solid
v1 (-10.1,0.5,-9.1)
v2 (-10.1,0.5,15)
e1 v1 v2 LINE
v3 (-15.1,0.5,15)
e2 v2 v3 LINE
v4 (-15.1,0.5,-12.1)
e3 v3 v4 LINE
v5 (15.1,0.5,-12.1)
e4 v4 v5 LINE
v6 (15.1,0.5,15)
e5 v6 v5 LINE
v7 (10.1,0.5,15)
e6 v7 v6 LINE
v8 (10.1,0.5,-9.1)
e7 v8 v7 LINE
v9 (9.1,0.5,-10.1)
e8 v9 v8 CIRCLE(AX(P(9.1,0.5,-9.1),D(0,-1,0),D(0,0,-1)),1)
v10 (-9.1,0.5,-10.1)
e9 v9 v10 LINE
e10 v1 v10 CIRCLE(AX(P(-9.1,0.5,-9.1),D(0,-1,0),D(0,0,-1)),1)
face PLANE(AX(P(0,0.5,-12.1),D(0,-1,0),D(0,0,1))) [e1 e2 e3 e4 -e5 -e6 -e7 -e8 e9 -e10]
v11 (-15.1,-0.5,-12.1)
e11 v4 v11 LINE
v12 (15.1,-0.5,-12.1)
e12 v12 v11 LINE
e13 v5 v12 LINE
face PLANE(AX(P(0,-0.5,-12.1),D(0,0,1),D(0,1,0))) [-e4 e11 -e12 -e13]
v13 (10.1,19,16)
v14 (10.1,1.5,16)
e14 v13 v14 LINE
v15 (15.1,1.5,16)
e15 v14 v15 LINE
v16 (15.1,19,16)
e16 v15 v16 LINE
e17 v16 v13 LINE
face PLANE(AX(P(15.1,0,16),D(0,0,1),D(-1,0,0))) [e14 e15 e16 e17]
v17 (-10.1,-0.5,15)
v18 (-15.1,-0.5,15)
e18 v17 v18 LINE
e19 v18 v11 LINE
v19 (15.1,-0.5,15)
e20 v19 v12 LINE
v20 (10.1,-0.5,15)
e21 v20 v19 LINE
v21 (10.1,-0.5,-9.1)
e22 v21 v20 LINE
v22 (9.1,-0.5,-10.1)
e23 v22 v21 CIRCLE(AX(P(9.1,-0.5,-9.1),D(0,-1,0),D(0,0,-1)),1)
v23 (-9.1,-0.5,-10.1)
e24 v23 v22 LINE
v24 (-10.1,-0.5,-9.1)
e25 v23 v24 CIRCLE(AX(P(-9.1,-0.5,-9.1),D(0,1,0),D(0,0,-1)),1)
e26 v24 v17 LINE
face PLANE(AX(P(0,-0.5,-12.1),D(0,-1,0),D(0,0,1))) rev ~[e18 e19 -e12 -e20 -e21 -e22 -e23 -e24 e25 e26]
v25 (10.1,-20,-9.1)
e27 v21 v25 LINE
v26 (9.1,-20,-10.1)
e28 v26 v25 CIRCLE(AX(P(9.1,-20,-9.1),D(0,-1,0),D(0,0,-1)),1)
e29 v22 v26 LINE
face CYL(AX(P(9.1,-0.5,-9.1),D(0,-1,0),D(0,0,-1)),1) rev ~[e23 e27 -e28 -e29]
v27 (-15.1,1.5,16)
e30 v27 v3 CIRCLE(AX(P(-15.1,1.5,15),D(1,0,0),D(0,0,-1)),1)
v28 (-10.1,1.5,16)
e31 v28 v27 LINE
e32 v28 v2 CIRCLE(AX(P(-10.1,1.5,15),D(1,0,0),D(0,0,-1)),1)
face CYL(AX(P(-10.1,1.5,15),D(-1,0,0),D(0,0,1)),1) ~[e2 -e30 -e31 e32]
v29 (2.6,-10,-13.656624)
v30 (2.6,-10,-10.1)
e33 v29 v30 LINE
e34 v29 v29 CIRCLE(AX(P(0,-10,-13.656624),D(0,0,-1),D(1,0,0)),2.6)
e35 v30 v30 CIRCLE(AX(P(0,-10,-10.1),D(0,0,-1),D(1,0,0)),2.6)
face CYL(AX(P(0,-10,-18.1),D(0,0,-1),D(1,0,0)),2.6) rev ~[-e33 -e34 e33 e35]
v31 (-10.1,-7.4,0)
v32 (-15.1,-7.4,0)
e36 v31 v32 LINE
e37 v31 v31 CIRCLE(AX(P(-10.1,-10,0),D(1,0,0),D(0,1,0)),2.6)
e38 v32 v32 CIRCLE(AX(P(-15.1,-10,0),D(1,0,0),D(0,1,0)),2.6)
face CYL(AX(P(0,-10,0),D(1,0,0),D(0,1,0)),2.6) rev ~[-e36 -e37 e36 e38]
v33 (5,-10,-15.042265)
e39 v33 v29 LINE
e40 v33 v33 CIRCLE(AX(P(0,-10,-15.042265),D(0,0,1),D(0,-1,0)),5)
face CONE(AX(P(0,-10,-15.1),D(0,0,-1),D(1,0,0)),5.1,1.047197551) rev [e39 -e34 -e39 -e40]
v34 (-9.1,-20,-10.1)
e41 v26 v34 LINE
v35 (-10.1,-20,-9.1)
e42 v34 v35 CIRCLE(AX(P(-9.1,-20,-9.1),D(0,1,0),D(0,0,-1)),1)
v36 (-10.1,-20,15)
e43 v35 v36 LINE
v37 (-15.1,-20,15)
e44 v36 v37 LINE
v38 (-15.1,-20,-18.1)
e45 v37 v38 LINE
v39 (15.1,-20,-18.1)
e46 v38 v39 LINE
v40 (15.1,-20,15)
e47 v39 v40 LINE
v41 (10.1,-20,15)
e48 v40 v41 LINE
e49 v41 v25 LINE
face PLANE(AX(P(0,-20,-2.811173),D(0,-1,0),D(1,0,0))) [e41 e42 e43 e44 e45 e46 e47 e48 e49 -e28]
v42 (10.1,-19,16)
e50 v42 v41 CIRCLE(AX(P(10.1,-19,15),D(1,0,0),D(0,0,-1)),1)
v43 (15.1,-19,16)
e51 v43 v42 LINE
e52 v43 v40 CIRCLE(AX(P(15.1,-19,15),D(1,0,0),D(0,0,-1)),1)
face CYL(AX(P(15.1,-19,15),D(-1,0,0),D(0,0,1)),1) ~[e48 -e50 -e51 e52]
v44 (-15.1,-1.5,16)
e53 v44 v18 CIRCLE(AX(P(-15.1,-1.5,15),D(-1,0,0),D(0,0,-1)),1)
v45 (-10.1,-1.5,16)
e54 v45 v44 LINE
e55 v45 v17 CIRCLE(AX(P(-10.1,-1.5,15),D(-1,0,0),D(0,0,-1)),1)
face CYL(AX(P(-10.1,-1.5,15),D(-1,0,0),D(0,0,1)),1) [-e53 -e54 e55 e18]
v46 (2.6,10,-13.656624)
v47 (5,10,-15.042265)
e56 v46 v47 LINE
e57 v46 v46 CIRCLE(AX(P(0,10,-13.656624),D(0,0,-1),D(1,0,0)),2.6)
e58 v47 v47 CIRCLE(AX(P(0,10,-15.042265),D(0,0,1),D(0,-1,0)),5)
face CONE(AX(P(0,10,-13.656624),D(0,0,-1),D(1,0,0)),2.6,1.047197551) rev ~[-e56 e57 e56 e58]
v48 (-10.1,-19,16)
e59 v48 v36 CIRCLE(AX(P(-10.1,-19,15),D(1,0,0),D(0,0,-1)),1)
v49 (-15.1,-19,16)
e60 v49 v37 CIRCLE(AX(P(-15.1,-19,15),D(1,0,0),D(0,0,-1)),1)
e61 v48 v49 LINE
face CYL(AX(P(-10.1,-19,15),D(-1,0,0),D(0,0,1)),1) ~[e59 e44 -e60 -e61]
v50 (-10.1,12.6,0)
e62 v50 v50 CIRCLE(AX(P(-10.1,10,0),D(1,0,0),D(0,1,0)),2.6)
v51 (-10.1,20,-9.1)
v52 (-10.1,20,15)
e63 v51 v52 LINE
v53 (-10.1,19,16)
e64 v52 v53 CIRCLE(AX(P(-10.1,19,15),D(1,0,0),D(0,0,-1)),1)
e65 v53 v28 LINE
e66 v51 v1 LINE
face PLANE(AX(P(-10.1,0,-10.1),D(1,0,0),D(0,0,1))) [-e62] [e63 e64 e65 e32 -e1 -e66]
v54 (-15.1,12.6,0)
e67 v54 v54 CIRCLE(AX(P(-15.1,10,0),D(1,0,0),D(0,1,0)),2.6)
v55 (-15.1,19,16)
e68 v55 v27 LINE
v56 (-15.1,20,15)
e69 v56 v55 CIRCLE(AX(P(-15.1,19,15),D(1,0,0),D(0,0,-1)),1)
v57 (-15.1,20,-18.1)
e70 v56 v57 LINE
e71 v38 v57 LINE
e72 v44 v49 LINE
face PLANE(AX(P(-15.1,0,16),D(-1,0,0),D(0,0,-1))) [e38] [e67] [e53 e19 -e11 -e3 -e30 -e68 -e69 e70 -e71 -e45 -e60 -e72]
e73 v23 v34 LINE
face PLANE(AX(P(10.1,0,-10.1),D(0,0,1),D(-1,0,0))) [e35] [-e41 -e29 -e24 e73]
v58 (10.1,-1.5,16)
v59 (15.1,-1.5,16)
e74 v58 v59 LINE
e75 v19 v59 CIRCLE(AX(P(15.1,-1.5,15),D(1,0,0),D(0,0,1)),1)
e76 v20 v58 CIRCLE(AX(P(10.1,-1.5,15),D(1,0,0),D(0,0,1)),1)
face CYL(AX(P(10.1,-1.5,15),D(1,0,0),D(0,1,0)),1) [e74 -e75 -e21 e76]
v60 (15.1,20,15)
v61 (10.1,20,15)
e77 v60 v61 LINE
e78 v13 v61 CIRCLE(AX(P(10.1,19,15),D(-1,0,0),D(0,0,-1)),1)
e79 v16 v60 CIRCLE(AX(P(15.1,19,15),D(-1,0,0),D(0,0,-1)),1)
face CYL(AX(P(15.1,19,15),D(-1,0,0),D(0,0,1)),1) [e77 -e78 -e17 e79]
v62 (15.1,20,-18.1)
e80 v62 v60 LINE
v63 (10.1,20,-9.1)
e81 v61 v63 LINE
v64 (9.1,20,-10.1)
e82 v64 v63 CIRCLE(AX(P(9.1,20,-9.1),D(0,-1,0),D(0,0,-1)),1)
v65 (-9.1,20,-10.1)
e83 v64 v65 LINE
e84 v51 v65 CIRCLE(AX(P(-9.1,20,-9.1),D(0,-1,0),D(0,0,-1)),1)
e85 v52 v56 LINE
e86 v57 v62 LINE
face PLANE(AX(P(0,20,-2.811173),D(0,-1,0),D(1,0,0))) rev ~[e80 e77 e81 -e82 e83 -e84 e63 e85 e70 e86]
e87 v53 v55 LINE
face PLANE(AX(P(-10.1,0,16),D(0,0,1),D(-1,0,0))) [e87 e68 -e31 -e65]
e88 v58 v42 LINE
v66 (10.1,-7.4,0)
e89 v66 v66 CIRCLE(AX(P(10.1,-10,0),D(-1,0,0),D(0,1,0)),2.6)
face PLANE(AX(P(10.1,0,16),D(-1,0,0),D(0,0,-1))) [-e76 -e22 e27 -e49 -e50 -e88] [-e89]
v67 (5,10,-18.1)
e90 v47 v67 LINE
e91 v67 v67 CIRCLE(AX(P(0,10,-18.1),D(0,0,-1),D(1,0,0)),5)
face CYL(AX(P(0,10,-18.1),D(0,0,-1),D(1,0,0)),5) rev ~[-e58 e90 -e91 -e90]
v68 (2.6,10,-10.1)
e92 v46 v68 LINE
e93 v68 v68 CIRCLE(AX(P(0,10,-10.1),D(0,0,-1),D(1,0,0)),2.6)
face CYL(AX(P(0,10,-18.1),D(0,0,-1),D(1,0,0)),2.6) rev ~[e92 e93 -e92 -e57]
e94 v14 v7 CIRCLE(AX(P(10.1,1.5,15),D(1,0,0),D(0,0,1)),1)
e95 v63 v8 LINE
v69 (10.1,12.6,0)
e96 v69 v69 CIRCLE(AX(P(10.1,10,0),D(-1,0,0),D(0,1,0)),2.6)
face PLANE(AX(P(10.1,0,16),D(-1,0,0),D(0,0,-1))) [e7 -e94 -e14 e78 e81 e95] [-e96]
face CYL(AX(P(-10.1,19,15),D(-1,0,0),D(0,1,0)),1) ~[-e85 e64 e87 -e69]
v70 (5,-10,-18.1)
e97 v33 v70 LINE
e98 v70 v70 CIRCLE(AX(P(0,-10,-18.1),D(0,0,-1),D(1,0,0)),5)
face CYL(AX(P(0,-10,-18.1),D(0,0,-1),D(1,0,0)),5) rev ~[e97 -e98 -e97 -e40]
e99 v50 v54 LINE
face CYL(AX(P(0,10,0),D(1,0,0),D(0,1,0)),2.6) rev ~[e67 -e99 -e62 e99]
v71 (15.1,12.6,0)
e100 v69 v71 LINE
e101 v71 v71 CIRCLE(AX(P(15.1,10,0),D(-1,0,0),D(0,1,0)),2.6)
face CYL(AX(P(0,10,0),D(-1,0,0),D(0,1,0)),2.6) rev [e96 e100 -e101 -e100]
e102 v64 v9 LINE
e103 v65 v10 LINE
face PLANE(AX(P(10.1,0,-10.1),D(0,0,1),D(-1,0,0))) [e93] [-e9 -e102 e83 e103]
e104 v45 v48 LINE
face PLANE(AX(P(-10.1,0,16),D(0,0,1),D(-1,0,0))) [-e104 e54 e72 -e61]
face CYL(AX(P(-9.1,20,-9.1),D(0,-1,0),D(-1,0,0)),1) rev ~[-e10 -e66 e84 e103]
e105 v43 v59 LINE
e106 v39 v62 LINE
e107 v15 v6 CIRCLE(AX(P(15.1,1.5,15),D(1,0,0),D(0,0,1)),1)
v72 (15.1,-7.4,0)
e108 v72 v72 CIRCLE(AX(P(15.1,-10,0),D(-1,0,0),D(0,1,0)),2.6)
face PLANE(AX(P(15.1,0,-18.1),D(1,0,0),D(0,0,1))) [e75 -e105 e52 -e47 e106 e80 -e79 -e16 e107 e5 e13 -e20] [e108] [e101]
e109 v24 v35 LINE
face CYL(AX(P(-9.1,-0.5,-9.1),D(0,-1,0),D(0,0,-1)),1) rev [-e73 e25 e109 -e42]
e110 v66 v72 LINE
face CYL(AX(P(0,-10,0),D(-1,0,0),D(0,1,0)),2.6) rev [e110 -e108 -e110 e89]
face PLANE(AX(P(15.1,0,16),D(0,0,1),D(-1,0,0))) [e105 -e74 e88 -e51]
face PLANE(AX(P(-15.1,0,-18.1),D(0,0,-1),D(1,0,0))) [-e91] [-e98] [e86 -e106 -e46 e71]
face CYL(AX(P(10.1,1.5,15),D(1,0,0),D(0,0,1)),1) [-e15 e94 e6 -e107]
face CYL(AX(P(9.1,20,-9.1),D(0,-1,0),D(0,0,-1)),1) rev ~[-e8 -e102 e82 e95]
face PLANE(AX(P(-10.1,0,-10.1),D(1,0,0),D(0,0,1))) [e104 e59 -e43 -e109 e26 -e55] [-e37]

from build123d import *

# Parameters (mm, degrees)
F2_DEPTH      = 20
F3_W          = 1
F3_H          = 28.1
F4_DEPTH      = 15.101
F4_DEPTH_BACK = 15.101
F5_R          = 2.6
F6_DEPTH      = 15.101
F6_DEPTH_BACK = 15.101
F7_R          = 2.6
F8_DEPTH      = 8
F9_R          = 5
F10_DEPTH     = 3
F11_S5_R      = 5
F11_T6_DEPTH  = 9
F11_S11_R     = 5
F11_T12_DEPTH = 9
F12_R         = 1


# Not quite as in the source:
# - a fillet or chamfer that OpenCascade refuses, or shapes differently, is made with other operations: its cross-section is extruded or revolved along the edge and cut away or added


with BuildPart() as f2:
    # F1 (on Front) → F2 (new body, symmetric)
    with BuildSketch(Plane.XZ):
        Polygon((15.1, 16), (10.1, 16), (10.1, -10.1), (-10.1, -10.1), (-10.1, 16), (-15.1, 16), (-15.1, -18.1), (15.1, -18.1), align=None)
    extrude(amount=F2_DEPTH, both=True)

    # F3 (on Right) → F4 (cut, two sides)
    with BuildSketch(Plane.YZ) as f4_sk:
        with Locations((0, 1.95)):
            Rectangle(F3_W, F3_H)
    extrude(amount=-F4_DEPTH, mode=Mode.SUBTRACT)
    extrude(f4_sk.sketch, amount=F4_DEPTH_BACK, mode=Mode.SUBTRACT)

    # F5 (on Right) → F6 (cut, two sides)
    with BuildSketch(Plane.YZ) as f6_sk:
        with Locations((10, 0)):
            Circle(F5_R)
        with Locations((-10, 0)):
            Circle(F5_R)
    extrude(amount=-F6_DEPTH, mode=Mode.SUBTRACT)
    extrude(f6_sk.sketch, amount=F6_DEPTH_BACK, mode=Mode.SUBTRACT)

    # F7 (on face) → F8 (cut, through all)
    with BuildSketch(Plane(origin=(0, 0, -18.1), x_dir=(1, 0, 0), z_dir=(0, 0, -1))):
        with Locations((0, 10)):
            Circle(F7_R)
        with Locations((0, -10)):
            Circle(F7_R)
    extrude(amount=-F8_DEPTH, mode=Mode.SUBTRACT)

    # F9 (on face) → F10 (cut)
    with BuildSketch(Plane(origin=(0, 0, -18.1), x_dir=(1, 0, 0), z_dir=(0, 0, -1))):
        with Locations((0, 10)):
            Circle(F9_R)
        with Locations((0, -10)):
            Circle(F9_R)
    extrude(amount=-F10_DEPTH, mode=Mode.SUBTRACT)

    # F11: chamfer of 2.5 x 1.443375673 on 2 edges, made by hand


with BuildPart() as f11_tool2:
    # F11_s3 → F11_t4 (revolve)
    with BuildSketch(Plane.XZ.offset(10)):
        Polygon((5.1, -15.1), (2.6, -13.656624327), (2.6, -15.1), align=None)
    revolve(axis=Axis((0, -10, -15.1), (0, 0, -1)))

    # F11_s5 → F11_t6 (intersect, symmetric)
    with BuildSketch(Plane.XY.offset(-14.4)):
        with Locations((0, -10)):
            Circle(F11_S5_R)
    extrude(amount=F11_T6_DEPTH, both=True, mode=Mode.INTERSECT)


with BuildPart() as f2_1:
    add(f2.part)

    # F11_t1: cut F11_tool2
    add(f11_tool2.part, mode=Mode.SUBTRACT)


with BuildPart() as f11_tool8:
    # F11_s9 → F11_t10 (revolve)
    with BuildSketch(Plane.XZ.offset(-10)):
        Polygon((2.6, -13.656624327), (5.1, -15.1), (2.6, -15.1), align=None)
    revolve(axis=Axis((0, 10, -15.1), (0, 0, -1)))

    # F11_s11 → F11_t12 (intersect, symmetric)
    with BuildSketch(Plane.XY.offset(-14.4)):
        with Locations((0, 10)):
            Circle(F11_S11_R)
    extrude(amount=F11_T12_DEPTH, both=True, mode=Mode.INTERSECT)


with BuildPart() as f2_2:
    add(f2_1.part)

    # F11_t7: cut F11_tool8
    add(f11_tool8.part, mode=Mode.SUBTRACT)

    # F12
    f12_edges = [f2_2.edges().sort_by_distance(p)[0] for p in [
        (-10.1, -10.25, -10.1),
        (-10.1, 10.25, -10.1),
        (10.1, -10.25, -10.1),
        (10.1, 10.25, -10.1),
        (-12.6, 20, 16),
        (12.6, 0.5, 16),
        (-12.6, 0.5, 16),
        (12.6, -0.5, 16),
        (-12.6, -0.5, 16),
        (-12.6, -20, 16),
        (12.6, 20, 16),
        (12.6, -20, 16),
    ]]
    fillet(f12_edges, radius=F12_R)


solid = f2_2.part
